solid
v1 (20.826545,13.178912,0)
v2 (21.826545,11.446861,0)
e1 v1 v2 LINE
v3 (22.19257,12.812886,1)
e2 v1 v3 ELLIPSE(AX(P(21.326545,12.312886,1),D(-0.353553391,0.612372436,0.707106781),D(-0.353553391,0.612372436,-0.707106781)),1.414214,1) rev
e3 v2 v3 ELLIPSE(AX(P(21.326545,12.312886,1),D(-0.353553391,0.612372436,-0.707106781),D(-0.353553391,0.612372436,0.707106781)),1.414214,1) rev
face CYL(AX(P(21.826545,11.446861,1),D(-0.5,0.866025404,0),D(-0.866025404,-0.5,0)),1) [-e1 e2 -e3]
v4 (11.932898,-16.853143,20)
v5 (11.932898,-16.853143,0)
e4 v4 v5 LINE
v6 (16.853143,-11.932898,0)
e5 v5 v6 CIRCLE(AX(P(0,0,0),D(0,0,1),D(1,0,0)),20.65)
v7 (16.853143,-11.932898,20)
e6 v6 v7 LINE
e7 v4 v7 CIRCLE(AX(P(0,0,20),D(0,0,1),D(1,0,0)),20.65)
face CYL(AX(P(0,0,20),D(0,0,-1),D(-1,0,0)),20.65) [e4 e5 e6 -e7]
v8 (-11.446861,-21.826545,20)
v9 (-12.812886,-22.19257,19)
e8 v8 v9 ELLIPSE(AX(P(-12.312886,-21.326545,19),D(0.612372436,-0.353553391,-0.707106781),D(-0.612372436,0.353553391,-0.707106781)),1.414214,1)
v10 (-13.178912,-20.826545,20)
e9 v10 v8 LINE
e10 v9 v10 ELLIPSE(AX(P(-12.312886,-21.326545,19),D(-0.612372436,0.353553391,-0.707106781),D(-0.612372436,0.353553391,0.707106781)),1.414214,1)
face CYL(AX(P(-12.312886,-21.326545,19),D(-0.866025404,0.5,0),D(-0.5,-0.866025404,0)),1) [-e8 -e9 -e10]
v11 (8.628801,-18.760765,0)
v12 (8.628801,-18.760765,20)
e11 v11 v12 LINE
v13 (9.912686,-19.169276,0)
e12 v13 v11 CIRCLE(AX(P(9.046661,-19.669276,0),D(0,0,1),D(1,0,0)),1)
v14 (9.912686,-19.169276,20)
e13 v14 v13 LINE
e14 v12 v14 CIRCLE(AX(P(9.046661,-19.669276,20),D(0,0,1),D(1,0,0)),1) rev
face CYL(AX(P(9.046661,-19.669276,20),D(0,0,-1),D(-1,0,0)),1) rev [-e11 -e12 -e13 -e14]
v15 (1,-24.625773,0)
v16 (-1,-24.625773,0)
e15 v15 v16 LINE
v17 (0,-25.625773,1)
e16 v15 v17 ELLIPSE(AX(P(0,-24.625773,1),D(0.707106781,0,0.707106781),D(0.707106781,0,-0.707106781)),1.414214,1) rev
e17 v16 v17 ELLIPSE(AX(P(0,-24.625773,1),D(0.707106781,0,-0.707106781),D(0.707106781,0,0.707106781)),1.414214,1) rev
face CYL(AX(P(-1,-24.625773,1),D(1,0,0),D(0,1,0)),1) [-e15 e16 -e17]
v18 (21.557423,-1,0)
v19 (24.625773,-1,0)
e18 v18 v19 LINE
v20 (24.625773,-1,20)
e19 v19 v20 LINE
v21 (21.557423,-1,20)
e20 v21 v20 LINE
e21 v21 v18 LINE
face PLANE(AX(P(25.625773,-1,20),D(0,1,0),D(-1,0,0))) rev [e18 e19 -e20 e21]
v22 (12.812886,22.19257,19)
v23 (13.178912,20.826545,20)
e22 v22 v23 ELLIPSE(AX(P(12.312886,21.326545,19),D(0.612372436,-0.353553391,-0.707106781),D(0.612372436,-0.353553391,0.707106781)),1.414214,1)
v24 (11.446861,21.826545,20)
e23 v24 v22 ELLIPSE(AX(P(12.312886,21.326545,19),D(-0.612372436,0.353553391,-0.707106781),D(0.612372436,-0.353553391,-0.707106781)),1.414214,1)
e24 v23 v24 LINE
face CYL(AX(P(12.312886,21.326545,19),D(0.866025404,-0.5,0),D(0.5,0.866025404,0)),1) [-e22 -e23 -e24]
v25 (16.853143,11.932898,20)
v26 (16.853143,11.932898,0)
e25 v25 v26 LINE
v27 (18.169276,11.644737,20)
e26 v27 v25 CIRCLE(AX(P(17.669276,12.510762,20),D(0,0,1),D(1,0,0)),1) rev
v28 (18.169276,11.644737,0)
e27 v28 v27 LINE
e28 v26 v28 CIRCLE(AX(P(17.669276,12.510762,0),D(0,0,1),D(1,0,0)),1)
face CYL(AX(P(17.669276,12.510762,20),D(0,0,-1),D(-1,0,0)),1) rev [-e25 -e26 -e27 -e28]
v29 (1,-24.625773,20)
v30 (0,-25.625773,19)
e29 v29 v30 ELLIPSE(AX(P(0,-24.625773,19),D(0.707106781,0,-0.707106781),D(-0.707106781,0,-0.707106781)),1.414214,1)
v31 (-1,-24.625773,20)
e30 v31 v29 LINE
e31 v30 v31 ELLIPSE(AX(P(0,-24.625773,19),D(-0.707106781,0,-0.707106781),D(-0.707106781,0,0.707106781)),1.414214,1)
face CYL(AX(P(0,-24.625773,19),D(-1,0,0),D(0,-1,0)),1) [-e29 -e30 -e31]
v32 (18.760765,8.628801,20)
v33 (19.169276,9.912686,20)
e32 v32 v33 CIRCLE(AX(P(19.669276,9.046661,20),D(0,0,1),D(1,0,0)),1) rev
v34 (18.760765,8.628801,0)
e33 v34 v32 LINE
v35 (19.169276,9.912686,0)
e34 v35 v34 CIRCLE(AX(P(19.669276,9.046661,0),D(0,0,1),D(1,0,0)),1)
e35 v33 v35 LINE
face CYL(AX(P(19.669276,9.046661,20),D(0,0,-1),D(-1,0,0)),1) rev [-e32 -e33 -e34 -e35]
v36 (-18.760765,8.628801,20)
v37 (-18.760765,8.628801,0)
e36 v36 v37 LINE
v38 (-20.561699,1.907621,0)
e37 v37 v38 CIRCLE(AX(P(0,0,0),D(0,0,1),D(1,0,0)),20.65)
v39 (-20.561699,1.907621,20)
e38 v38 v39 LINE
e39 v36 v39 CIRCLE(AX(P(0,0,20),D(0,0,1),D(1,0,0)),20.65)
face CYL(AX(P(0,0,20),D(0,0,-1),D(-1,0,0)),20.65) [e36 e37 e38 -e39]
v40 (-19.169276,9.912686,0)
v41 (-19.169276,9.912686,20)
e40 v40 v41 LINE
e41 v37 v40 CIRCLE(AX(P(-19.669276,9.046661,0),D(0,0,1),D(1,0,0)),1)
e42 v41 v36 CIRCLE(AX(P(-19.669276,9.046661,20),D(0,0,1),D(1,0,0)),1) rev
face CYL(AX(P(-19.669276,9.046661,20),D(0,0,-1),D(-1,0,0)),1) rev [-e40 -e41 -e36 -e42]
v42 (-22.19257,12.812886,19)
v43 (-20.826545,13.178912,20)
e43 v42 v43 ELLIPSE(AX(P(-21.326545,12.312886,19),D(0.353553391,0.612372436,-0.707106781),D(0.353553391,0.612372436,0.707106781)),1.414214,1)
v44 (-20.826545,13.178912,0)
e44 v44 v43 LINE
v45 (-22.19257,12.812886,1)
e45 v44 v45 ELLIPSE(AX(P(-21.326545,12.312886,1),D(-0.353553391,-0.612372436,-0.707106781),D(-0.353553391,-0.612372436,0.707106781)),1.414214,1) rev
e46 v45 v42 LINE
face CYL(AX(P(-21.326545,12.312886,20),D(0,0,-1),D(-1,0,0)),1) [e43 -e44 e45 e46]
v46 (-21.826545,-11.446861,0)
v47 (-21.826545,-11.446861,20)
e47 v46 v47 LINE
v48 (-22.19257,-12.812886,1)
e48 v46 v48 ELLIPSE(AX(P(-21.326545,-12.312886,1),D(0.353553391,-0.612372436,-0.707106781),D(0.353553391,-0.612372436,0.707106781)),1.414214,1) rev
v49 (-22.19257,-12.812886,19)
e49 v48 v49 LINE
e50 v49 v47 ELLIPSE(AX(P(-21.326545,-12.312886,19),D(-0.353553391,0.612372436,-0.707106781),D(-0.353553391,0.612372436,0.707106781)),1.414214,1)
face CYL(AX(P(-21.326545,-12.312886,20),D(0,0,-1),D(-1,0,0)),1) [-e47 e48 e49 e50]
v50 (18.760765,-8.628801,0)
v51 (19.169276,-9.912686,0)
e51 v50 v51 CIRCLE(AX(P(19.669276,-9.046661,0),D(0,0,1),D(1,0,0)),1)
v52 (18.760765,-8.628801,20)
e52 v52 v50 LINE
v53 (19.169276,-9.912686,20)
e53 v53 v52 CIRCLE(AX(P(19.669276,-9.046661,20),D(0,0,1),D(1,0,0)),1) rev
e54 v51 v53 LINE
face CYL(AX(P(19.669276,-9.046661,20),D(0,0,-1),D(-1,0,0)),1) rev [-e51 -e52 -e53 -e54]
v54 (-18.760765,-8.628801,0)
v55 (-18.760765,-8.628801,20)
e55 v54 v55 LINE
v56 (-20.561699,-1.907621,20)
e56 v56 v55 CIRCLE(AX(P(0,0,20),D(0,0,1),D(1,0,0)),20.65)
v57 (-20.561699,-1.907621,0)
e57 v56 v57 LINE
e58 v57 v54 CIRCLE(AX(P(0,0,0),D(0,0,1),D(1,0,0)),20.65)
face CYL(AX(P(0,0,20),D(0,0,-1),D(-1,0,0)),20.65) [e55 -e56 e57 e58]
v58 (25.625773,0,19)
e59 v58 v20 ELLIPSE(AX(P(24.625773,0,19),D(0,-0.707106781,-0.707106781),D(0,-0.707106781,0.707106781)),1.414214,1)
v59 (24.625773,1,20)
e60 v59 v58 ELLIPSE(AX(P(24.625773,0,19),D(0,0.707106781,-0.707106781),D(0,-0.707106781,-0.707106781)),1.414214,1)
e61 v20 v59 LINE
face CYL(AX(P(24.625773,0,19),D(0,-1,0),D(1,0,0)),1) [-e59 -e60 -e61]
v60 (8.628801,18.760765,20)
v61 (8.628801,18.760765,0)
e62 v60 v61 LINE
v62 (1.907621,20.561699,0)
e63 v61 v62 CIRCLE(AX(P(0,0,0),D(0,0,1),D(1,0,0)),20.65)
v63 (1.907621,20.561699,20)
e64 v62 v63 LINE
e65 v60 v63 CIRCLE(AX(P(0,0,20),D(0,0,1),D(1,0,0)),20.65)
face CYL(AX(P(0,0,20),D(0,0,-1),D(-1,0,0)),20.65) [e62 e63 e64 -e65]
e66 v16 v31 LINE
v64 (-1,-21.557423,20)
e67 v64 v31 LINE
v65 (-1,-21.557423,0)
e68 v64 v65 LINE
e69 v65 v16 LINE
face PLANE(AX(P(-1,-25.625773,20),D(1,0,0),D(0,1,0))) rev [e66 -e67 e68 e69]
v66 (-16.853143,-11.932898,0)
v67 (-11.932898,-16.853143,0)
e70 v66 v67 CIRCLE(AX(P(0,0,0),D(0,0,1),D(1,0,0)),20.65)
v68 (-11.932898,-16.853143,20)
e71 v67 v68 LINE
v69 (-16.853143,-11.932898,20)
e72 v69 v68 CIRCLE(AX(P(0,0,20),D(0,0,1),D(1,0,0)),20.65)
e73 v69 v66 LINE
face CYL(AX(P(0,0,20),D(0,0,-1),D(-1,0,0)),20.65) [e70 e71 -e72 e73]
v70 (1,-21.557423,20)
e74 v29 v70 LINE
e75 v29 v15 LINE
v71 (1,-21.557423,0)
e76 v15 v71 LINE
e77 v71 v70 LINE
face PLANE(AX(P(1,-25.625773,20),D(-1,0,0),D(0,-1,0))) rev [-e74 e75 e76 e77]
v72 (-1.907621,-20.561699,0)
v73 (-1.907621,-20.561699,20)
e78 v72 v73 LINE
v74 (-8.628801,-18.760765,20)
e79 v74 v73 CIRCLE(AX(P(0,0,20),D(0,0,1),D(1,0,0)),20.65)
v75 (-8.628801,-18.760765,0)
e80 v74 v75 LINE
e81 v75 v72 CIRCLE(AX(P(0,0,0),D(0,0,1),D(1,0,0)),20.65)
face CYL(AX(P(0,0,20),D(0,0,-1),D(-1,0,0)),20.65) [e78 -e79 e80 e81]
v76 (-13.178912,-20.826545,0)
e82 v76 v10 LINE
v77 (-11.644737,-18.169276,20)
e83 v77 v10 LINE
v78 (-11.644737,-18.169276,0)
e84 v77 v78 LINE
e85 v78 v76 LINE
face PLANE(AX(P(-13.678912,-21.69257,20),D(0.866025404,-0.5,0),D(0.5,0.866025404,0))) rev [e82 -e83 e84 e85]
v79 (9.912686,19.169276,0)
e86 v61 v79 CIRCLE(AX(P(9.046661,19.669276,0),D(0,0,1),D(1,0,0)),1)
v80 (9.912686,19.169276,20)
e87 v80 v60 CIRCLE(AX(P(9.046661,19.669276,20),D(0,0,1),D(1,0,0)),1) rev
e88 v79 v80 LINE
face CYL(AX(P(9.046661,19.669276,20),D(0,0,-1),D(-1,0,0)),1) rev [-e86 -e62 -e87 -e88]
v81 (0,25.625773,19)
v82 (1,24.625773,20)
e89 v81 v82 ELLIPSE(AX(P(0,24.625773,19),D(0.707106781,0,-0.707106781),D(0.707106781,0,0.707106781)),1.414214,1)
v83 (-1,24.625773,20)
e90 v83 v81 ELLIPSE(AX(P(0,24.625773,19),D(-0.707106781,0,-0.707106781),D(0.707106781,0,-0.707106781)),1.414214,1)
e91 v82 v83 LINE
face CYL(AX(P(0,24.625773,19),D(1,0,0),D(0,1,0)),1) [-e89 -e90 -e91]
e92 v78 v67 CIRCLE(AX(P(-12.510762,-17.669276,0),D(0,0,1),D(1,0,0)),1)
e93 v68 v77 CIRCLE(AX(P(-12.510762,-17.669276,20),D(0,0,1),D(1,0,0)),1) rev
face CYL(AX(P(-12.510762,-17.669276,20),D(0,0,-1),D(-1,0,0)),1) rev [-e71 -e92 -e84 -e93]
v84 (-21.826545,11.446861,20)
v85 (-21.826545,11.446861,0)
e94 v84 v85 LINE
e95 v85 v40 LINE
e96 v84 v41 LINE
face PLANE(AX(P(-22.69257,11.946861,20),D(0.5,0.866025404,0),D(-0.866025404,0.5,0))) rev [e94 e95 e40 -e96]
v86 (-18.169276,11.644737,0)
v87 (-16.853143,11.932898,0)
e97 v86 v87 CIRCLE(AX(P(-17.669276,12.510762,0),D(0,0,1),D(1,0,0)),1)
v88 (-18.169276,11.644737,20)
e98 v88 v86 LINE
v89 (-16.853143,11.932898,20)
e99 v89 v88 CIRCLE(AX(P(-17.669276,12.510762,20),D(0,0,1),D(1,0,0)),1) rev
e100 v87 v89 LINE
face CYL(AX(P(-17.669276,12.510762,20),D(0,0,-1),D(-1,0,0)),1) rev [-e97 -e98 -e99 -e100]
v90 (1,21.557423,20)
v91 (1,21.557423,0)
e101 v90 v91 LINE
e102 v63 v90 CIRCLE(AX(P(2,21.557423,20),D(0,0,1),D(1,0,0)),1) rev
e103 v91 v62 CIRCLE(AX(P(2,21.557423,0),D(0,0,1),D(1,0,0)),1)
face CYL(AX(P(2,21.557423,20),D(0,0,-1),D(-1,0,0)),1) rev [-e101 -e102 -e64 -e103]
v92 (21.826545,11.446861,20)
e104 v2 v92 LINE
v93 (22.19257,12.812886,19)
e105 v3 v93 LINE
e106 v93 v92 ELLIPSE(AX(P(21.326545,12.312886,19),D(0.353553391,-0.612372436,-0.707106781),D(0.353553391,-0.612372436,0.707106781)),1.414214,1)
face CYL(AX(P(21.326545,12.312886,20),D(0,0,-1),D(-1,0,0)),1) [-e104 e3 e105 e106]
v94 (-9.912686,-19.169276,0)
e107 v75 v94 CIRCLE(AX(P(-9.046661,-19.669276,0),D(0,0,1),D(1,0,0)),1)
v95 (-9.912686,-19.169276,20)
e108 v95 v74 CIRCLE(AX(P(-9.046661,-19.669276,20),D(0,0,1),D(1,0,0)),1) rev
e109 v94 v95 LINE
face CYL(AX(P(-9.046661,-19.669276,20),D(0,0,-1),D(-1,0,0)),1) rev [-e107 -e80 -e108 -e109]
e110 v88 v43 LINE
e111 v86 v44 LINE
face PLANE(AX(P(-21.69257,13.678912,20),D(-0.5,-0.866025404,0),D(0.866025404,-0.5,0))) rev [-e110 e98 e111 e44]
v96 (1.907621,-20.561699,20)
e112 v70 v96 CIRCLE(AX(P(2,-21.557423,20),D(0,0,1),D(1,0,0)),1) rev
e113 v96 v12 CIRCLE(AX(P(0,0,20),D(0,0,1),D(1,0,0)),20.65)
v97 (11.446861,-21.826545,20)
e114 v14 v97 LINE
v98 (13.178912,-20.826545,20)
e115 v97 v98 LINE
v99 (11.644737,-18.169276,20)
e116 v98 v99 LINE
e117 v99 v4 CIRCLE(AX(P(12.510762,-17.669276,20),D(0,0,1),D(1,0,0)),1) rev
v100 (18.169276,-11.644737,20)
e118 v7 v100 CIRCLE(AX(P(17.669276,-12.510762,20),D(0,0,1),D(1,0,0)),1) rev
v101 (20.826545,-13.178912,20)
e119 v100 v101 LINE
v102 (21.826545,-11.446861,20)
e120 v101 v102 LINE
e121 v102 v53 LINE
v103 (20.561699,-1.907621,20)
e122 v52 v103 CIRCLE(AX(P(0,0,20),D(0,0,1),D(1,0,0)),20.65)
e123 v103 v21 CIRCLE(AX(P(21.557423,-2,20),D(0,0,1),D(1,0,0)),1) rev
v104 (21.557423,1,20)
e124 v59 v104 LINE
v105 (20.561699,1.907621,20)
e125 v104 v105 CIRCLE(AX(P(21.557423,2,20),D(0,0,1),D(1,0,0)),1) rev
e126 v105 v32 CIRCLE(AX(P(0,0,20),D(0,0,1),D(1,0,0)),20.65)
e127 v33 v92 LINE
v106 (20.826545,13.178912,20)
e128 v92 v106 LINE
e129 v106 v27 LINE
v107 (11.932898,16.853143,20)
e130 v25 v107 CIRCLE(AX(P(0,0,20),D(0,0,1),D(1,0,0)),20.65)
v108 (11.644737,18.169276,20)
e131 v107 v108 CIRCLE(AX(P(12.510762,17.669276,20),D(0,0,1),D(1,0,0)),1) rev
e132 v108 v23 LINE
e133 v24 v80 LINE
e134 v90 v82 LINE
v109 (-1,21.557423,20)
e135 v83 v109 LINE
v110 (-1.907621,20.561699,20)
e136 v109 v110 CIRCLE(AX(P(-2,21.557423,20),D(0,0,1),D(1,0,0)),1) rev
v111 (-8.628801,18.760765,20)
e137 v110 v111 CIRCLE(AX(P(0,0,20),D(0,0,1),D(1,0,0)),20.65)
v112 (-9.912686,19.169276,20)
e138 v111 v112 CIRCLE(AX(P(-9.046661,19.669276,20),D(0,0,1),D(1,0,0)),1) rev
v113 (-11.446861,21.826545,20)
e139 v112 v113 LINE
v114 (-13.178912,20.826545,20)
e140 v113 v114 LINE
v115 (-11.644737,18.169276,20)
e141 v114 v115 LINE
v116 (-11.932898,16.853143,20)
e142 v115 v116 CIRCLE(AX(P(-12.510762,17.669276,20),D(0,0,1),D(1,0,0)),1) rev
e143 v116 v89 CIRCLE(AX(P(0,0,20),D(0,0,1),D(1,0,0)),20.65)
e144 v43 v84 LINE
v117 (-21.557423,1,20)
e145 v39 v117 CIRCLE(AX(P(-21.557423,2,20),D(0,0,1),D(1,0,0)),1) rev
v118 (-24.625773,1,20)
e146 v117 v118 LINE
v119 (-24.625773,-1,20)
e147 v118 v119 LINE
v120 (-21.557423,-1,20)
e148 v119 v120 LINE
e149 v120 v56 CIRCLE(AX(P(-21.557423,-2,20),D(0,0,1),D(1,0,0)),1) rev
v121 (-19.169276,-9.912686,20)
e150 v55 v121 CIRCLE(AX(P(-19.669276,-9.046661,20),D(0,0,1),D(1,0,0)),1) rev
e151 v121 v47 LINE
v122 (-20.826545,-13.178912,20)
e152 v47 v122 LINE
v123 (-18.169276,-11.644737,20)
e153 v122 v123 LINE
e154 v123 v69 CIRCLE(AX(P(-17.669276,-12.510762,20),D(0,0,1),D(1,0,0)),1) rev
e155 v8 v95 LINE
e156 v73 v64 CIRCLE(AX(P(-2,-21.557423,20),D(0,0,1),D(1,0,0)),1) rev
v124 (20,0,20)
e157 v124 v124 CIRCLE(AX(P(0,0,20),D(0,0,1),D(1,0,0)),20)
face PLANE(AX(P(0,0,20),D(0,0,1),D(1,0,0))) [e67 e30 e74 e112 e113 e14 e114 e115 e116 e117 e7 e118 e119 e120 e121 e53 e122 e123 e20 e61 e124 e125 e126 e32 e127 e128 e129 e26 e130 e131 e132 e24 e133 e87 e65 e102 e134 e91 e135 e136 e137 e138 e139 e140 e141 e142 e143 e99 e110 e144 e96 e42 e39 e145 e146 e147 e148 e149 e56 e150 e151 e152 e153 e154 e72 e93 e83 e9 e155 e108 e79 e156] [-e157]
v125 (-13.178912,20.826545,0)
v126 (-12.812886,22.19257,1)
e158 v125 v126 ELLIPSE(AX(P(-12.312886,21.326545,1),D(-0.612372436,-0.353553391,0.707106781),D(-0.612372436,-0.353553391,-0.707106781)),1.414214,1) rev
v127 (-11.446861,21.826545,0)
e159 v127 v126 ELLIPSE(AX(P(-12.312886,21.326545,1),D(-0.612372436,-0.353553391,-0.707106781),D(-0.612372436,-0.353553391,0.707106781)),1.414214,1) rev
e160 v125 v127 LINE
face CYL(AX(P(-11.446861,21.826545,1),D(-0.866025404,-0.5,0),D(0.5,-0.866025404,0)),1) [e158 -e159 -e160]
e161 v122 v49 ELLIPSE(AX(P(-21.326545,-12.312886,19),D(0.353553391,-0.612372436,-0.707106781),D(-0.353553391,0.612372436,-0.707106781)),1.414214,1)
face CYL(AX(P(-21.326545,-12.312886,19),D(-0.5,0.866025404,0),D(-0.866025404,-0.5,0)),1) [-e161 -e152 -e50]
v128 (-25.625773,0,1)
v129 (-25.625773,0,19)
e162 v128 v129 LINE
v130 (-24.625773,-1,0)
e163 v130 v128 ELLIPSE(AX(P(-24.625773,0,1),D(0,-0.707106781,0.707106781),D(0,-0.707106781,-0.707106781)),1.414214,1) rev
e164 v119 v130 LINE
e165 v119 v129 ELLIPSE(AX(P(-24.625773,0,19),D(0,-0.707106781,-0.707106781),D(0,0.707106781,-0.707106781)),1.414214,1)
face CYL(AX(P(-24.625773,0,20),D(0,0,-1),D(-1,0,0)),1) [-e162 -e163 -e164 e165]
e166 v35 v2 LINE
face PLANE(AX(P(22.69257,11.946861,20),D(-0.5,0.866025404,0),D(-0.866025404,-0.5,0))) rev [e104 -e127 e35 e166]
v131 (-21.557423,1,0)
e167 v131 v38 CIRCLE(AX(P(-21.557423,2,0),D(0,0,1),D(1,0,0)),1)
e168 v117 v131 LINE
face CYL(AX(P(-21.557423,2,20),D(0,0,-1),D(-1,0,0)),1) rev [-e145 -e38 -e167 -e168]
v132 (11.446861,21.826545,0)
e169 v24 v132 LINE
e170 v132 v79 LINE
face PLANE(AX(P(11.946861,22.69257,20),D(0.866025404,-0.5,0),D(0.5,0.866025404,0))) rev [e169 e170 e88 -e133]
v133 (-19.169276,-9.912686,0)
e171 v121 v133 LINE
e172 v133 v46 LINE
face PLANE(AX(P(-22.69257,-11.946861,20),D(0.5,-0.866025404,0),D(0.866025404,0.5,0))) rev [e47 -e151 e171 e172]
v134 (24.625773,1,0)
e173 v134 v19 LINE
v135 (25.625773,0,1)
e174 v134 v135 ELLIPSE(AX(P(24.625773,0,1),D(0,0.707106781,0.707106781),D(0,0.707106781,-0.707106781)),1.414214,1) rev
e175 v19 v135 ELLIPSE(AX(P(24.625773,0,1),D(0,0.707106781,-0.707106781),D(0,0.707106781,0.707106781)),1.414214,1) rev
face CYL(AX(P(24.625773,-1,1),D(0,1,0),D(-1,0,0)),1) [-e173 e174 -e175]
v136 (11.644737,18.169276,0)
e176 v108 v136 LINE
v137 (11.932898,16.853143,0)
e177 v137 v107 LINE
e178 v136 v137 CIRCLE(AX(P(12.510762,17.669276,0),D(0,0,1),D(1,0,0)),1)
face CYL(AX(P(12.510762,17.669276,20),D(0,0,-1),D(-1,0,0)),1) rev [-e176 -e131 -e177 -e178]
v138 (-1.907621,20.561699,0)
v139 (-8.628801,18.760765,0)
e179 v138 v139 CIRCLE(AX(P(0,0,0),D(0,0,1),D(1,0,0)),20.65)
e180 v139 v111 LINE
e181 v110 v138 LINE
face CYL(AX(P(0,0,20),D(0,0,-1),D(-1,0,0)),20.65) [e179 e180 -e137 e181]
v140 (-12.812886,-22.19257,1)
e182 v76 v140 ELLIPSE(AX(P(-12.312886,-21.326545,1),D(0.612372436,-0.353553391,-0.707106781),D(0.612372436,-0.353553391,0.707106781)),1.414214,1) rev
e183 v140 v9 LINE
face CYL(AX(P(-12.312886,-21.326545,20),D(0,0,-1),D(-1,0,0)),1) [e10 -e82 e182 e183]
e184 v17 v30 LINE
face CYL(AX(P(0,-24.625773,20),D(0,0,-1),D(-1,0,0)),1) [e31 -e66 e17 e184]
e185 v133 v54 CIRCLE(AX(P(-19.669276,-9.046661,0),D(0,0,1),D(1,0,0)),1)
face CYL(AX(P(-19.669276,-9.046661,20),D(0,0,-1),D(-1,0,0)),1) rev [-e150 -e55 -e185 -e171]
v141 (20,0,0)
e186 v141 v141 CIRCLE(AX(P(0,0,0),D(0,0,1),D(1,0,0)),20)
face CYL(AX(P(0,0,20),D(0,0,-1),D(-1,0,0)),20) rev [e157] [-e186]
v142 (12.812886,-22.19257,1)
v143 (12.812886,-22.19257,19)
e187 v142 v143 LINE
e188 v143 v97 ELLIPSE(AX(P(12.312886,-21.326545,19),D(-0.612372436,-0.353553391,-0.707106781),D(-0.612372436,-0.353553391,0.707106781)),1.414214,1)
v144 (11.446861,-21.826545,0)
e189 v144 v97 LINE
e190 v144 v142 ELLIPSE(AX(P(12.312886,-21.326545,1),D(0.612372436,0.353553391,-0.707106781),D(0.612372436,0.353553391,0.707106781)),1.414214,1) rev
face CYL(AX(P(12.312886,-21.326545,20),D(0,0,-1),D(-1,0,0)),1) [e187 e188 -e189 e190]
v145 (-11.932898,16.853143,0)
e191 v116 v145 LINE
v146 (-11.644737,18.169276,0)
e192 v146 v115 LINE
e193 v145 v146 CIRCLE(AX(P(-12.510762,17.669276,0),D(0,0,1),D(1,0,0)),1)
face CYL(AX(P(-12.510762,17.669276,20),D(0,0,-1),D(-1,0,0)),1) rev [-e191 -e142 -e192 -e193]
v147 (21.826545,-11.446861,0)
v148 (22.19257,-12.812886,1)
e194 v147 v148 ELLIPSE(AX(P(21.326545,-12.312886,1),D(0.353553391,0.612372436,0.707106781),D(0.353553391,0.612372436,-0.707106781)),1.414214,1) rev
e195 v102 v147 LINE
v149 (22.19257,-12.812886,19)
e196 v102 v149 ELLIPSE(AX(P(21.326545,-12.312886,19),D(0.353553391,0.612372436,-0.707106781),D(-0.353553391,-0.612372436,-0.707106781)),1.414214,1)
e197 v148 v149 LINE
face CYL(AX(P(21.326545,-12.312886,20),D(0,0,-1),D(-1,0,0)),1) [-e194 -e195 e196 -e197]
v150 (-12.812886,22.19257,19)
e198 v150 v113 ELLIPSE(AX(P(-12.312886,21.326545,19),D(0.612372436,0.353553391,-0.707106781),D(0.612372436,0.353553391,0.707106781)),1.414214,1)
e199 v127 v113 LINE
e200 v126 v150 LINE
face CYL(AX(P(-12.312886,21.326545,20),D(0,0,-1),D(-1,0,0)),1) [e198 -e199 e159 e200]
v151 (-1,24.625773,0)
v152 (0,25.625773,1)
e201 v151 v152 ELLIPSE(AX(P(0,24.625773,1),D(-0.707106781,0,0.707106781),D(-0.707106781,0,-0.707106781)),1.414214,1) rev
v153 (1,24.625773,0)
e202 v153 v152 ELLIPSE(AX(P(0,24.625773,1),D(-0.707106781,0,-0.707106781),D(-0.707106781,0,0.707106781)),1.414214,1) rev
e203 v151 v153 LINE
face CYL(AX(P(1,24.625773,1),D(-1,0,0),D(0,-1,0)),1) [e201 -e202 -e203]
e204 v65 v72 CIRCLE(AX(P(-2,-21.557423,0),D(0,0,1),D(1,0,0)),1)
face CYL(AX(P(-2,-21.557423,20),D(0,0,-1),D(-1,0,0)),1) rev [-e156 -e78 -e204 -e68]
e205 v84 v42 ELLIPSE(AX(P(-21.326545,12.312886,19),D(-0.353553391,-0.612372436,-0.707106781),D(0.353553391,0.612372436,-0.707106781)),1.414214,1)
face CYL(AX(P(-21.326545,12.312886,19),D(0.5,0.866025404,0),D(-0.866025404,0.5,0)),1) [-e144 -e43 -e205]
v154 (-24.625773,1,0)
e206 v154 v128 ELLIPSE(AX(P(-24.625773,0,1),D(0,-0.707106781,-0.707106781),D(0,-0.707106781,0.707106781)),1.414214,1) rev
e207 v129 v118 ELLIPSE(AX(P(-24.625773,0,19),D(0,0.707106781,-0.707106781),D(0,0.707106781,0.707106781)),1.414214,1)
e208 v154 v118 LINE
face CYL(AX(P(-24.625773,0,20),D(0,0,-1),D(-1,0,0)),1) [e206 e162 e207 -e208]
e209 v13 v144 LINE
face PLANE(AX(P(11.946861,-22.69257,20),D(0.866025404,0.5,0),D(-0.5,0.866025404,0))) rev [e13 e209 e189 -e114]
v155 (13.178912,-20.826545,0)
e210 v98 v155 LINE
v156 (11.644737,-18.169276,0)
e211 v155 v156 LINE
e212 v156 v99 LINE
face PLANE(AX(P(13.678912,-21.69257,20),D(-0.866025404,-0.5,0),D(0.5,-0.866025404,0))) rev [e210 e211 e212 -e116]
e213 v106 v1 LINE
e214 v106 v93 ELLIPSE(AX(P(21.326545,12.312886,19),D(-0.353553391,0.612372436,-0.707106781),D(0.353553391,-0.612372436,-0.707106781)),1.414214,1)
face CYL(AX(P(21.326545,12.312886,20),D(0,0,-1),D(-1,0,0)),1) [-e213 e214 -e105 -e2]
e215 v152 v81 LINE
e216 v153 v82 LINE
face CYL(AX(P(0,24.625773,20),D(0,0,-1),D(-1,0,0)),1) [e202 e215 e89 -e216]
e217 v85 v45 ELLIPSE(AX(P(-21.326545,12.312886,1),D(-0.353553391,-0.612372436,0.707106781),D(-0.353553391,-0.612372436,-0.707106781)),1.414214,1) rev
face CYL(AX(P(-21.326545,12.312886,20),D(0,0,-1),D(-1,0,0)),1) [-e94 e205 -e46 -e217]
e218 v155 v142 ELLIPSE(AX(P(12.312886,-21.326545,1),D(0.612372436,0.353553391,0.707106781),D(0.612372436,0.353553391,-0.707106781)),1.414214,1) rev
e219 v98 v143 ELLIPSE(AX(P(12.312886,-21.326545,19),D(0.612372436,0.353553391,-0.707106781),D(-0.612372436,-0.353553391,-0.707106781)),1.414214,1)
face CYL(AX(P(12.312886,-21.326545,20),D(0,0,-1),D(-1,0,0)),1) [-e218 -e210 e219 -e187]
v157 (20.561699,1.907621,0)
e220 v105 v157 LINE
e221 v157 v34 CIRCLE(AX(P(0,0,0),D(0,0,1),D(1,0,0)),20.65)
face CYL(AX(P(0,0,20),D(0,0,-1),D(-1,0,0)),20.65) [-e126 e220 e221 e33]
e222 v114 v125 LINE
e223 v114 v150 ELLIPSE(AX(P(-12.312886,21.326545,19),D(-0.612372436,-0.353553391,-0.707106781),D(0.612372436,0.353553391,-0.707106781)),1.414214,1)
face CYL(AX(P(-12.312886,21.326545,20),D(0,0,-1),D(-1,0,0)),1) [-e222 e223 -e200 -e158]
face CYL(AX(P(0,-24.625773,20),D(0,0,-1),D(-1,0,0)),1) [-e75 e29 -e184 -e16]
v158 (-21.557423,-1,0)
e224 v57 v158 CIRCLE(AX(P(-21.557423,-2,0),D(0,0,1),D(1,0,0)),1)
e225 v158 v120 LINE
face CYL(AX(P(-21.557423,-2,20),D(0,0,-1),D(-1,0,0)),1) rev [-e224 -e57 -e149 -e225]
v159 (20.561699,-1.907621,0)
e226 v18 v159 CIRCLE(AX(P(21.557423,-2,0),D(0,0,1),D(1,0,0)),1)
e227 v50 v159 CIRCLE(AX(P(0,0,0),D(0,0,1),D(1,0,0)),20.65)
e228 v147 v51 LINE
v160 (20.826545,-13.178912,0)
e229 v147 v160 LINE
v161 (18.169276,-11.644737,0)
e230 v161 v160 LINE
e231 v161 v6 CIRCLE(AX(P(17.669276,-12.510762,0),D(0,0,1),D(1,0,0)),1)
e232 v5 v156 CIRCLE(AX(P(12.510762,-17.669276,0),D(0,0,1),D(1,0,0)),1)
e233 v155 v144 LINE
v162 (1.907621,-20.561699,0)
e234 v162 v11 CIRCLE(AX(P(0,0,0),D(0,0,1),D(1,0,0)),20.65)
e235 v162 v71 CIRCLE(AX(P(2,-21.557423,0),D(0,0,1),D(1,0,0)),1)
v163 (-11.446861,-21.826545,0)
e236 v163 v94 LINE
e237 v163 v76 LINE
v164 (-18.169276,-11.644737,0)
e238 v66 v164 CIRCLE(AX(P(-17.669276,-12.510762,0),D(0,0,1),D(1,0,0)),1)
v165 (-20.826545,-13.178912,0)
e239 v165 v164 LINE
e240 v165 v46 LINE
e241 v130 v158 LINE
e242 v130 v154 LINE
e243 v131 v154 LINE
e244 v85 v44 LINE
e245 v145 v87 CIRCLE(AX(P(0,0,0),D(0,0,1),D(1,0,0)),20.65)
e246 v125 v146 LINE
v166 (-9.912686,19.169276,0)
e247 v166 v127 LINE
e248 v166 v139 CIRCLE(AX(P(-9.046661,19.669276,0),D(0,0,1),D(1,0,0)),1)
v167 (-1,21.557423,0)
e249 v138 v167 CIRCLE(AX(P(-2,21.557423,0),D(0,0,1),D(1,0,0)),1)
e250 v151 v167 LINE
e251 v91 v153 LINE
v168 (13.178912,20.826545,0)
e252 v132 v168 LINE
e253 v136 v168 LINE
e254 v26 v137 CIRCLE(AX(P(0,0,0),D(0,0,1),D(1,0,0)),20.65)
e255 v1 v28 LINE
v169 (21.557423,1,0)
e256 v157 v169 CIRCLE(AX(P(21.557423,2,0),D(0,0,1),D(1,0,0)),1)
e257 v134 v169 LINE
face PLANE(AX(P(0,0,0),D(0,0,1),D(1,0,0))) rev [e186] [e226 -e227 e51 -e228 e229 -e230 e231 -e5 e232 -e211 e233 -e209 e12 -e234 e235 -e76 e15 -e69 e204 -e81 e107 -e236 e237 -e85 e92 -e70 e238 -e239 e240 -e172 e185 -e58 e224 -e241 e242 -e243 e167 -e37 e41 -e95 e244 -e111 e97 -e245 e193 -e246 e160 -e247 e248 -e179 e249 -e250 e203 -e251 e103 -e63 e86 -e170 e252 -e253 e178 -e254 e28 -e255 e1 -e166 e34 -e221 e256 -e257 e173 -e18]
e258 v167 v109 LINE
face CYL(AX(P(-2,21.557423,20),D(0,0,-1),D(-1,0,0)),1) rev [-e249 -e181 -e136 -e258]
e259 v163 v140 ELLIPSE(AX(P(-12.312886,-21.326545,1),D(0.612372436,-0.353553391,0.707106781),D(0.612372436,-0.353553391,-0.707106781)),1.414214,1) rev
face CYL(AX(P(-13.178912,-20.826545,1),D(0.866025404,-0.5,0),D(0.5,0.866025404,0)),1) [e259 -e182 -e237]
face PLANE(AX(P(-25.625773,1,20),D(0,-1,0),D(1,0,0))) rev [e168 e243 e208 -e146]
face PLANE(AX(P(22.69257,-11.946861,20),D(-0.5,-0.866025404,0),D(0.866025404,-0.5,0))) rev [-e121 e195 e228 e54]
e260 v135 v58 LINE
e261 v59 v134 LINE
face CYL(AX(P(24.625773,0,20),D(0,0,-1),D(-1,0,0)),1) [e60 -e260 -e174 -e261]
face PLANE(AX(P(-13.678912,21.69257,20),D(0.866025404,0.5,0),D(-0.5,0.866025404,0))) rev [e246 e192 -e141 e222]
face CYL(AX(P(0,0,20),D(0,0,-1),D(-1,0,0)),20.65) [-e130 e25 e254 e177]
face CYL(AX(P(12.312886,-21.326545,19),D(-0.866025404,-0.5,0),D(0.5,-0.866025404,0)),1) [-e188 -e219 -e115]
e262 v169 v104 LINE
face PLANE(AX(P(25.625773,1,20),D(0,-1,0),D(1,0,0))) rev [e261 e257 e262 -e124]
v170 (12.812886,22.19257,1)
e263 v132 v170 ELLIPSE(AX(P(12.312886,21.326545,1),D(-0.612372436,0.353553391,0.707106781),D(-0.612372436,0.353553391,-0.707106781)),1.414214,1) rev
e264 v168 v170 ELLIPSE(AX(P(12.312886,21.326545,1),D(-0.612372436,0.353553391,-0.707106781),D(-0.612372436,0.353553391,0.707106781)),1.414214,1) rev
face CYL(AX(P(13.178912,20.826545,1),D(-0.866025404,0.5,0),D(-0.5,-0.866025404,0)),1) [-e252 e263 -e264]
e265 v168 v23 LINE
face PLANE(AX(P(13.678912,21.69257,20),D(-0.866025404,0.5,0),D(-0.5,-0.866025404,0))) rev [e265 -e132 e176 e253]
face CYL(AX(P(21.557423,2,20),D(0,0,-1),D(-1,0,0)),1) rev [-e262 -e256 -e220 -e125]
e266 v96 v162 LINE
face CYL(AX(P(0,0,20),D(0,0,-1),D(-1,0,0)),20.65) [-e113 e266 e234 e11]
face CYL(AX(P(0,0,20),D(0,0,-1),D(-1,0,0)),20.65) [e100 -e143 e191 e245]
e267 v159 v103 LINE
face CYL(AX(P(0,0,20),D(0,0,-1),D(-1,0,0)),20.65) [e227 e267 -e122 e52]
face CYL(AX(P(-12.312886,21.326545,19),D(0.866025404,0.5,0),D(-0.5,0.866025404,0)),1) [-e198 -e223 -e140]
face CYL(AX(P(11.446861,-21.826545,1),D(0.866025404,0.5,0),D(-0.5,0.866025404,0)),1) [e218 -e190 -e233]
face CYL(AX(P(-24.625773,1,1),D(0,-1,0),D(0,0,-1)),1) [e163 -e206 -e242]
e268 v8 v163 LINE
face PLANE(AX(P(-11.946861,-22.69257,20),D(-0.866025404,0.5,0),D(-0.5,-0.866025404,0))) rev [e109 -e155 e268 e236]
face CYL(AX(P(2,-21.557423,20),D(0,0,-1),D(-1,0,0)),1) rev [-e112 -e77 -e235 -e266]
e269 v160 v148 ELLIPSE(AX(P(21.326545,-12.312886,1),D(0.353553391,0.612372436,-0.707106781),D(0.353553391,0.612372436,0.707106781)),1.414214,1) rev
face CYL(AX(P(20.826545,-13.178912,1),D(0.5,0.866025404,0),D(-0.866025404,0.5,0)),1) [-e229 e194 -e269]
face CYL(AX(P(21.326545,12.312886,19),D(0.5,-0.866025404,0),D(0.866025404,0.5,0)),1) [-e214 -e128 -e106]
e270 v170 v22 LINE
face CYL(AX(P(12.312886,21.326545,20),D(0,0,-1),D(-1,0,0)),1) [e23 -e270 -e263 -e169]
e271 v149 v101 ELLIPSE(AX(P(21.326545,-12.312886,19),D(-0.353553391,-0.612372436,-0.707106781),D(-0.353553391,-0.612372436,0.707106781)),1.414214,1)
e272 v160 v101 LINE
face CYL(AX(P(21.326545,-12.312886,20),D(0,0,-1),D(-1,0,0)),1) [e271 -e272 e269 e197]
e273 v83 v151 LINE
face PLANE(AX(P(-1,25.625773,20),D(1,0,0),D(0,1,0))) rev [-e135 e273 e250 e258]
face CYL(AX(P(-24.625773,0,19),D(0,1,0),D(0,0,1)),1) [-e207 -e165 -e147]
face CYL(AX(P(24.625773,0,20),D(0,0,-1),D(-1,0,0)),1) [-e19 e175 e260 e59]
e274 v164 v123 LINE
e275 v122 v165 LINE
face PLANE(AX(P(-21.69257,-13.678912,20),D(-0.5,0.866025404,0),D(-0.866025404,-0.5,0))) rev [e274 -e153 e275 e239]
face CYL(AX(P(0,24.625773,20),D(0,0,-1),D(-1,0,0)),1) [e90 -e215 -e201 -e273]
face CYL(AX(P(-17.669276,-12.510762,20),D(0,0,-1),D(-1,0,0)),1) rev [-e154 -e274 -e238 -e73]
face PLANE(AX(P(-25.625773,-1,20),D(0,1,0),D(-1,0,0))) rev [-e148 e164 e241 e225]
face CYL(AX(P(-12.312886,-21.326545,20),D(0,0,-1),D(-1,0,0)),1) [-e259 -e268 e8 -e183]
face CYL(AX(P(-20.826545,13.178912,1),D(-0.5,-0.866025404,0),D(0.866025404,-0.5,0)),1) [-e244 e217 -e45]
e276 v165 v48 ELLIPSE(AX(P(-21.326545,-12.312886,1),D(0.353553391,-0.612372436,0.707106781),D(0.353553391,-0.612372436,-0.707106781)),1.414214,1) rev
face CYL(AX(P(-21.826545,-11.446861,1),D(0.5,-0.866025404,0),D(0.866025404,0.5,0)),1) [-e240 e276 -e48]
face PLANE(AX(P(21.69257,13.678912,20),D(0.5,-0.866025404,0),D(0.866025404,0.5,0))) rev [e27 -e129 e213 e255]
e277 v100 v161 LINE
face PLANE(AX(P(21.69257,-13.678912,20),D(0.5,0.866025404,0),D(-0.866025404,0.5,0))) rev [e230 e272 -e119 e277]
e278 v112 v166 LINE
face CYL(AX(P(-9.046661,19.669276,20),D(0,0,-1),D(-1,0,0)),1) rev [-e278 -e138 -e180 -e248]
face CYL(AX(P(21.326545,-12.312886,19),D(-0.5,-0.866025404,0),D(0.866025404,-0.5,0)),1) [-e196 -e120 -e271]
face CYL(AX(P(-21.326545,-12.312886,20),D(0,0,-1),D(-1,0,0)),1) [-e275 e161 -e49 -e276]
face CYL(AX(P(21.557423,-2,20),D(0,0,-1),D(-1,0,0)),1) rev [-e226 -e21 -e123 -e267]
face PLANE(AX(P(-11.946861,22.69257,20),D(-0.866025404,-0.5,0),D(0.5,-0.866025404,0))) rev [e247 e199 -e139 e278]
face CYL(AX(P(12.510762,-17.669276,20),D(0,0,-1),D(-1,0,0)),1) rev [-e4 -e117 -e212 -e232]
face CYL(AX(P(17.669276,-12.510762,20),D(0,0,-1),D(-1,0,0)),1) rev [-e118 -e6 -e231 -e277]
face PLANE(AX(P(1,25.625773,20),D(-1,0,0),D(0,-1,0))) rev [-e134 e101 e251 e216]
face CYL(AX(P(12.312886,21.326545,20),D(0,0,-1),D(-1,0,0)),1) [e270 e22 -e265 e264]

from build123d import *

# Parameters (mm, degrees)
SKIZZE1_R                       = 20
AUFSATZ_LINEAR_AUSTRAGEN2_DEPTH = 20
VERRUNDUNG1_R                   = 1


with BuildPart() as part:
    # Skizze1 → Aufsatz-Linear austragen2 (new body)
    with BuildSketch(Plane.XY):
        with BuildLine():
            Line((-22.692570161, 11.946860953), (-18.362443142, 9.446860953))
            ThreePointArc((-18.362443142, 9.446860953), (-19.946368313, 5.344613281), (-20.625772713, 1))
            Line((-20.625772713, 1), (-25.625772713, 1))
            Line((-25.625772713, 1), (-25.625772713, -1))
            Line((-25.625772713, -1), (-20.625772713, -1))
            ThreePointArc((-20.625772713, -1), (-19.946368313, -5.344613281), (-18.362443142, -9.446860953))
            Line((-18.362443142, -9.446860953), (-22.692570161, -11.946860953))
            Line((-22.692570161, -11.946860953), (-21.692570161, -13.67891176))
            Line((-21.692570161, -13.67891176), (-17.362443142, -11.17891176))
            ThreePointArc((-17.362443142, -11.17891176), (-14.601755032, -14.601755032), (-11.17891176, -17.362443142))
            Line((-11.17891176, -17.362443142), (-13.67891176, -21.692570161))
            Line((-13.67891176, -21.692570161), (-11.946860953, -22.692570161))
            Line((-11.946860953, -22.692570161), (-9.446860953, -18.362443142))
            ThreePointArc((-9.446860953, -18.362443142), (-5.344613281, -19.946368313), (-1, -20.625772713))
            Line((-1, -20.625772713), (-1, -25.625772713))
            Line((-1, -25.625772713), (1, -25.625772713))
            Line((1, -25.625772713), (1, -20.625772713))
            ThreePointArc((1, -20.625772713), (5.344613281, -19.946368313), (9.446860953, -18.362443142))
            Line((9.446860953, -18.362443142), (11.946860953, -22.692570161))
            Line((11.946860953, -22.692570161), (13.67891176, -21.692570161))
            Line((13.67891176, -21.692570161), (11.17891176, -17.362443142))
            ThreePointArc((11.17891176, -17.362443142), (14.601755032, -14.601755032), (17.362443142, -11.17891176))
            Line((17.362443142, -11.17891176), (21.692570161, -13.67891176))
            Line((21.692570161, -13.67891176), (22.692570161, -11.946860953))
            Line((22.692570161, -11.946860953), (18.362443142, -9.446860953))
            ThreePointArc((18.362443142, -9.446860953), (19.946368313, -5.344613281), (20.625772713, -1))
            Line((20.625772713, -1), (25.625772713, -1))
            Line((25.625772713, -1), (25.625772713, 1))
            Line((25.625772713, 1), (20.625772713, 1))
            ThreePointArc((20.625772713, 1), (19.946368313, 5.344613281), (18.362443142, 9.446860953))
            Line((18.362443142, 9.446860953), (22.692570161, 11.946860953))
            Line((22.692570161, 11.946860953), (21.692570161, 13.67891176))
            Line((21.692570161, 13.67891176), (17.362443142, 11.17891176))
            ThreePointArc((17.362443142, 11.17891176), (14.601755032, 14.601755032), (11.17891176, 17.362443142))
            Line((11.17891176, 17.362443142), (13.67891176, 21.692570161))
            Line((13.67891176, 21.692570161), (11.946860953, 22.692570161))
            Line((11.946860953, 22.692570161), (9.446860953, 18.362443142))
            ThreePointArc((9.446860953, 18.362443142), (5.344613281, 19.946368313), (1, 20.625772713))
            Line((1, 20.625772713), (1, 25.625772713))
            Line((1, 25.625772713), (-1, 25.625772713))
            Line((-1, 25.625772713), (-1, 20.625772713))
            ThreePointArc((-1, 20.625772713), (-5.344613281, 19.946368313), (-9.446860953, 18.362443142))
            Line((-9.446860953, 18.362443142), (-11.946860953, 22.692570161))
            Line((-11.946860953, 22.692570161), (-13.67891176, 21.692570161))
            Line((-13.67891176, 21.692570161), (-11.17891176, 17.362443142))
            ThreePointArc((-11.17891176, 17.362443142), (-14.601755032, 14.601755032), (-17.362443142, 11.17891176))
            Line((-17.362443142, 11.17891176), (-21.692570161, 13.67891176))
            Line((-21.692570161, 13.67891176), (-22.692570161, 11.946860953))
        make_face()
        Circle(SKIZZE1_R, mode=Mode.SUBTRACT)
    extrude(amount=AUFSATZ_LINEAR_AUSTRAGEN2_DEPTH)

    # Verrundung1
    verrundung1_edges = [part.edges().sort_by_distance(p)[0] for p in [
        (25.625772713, 0, 20),
        (22.192570161, 12.812886356, 20),
        (-25.625772713, 0, 20),
        (12.812886356, 22.192570161, 20),
        (0, 25.625772713, 20),
        (-12.812886356, 22.192570161, 20),
        (-22.192570161, 12.812886356, 20),
        (-22.192570161, -12.812886356, 20),
        (-12.812886356, -22.192570161, 20),
        (-22.192570161, 12.812886356, 0),
        (-12.812886356, 22.192570161, 0),
        (0, 25.625772713, 0),
        (12.812886356, 22.192570161, 0),
        (22.192570161, 12.812886356, 0),
        (25.625772713, 0, 0),
        (22.192570161, -12.812886356, 0),
        (12.812886356, -22.192570161, 0),
        (0, -25.625772713, 0),
        (-12.812886356, -22.192570161, 0),
        (0, -25.625772713, 20),
        (-22.192570161, -12.812886356, 0),
        (-25.625772713, 0, 0),
        (12.812886356, -22.192570161, 20),
        (-18.362443142, 9.446860953, 10),
        (-22.692570161, 11.946860953, 10),
        (-21.692570161, 13.67891176, 10),
        (-17.362443142, 11.17891176, 10),
        (-11.17891176, 17.362443142, 10),
        (-13.67891176, 21.692570161, 10),
        (-11.946860953, 22.692570161, 10),
        (-9.446860953, 18.362443142, 10),
        (-1, 20.625772713, 10),
        (-1, 25.625772713, 10),
        (1, 25.625772713, 10),
        (1, 20.625772713, 10),
        (9.446860953, 18.362443142, 10),
        (11.946860953, 22.692570161, 10),
        (13.67891176, 21.692570161, 10),
        (11.17891176, 17.362443142, 10),
        (17.362443142, 11.17891176, 10),
        (21.692570161, 13.67891176, 10),
        (22.692570161, 11.946860953, 10),
        (18.362443142, 9.446860953, 10),
        (20.625772713, 1, 10),
        (25.625772713, 1, 10),
        (25.625772713, -1, 10),
        (20.625772713, -1, 10),
        (18.362443142, -9.446860953, 10),
        (22.692570161, -11.946860953, 10),
        (21.692570161, -13.67891176, 10),
        (17.362443142, -11.17891176, 10),
        (11.17891176, -17.362443142, 10),
        (13.67891176, -21.692570161, 10),
        (11.946860953, -22.692570161, 10),
        (9.446860953, -18.362443142, 10),
        (1, -20.625772713, 10),
        (1, -25.625772713, 10),
        (-1, -25.625772713, 10),
        (-1, -20.625772713, 10),
        (-9.446860953, -18.362443142, 10),
        (-11.946860953, -22.692570161, 10),
        (-13.67891176, -21.692570161, 10),
        (-11.17891176, -17.362443142, 10),
        (-17.362443142, -11.17891176, 10),
        (-21.692570161, -13.67891176, 10),
        (-22.692570161, -11.946860953, 10),
        (-18.362443142, -9.446860953, 10),
        (-20.625772713, -1, 10),
        (-25.625772713, -1, 10),
        (-25.625772713, 1, 10),
        (-20.625772713, 1, 10),
        (22.192570161, -12.812886356, 20),
    ]]
    fillet(verrundung1_edges, radius=VERRUNDUNG1_R - 0.0001)  # a hair under: the kernel refuses the full size


solid = part.part
